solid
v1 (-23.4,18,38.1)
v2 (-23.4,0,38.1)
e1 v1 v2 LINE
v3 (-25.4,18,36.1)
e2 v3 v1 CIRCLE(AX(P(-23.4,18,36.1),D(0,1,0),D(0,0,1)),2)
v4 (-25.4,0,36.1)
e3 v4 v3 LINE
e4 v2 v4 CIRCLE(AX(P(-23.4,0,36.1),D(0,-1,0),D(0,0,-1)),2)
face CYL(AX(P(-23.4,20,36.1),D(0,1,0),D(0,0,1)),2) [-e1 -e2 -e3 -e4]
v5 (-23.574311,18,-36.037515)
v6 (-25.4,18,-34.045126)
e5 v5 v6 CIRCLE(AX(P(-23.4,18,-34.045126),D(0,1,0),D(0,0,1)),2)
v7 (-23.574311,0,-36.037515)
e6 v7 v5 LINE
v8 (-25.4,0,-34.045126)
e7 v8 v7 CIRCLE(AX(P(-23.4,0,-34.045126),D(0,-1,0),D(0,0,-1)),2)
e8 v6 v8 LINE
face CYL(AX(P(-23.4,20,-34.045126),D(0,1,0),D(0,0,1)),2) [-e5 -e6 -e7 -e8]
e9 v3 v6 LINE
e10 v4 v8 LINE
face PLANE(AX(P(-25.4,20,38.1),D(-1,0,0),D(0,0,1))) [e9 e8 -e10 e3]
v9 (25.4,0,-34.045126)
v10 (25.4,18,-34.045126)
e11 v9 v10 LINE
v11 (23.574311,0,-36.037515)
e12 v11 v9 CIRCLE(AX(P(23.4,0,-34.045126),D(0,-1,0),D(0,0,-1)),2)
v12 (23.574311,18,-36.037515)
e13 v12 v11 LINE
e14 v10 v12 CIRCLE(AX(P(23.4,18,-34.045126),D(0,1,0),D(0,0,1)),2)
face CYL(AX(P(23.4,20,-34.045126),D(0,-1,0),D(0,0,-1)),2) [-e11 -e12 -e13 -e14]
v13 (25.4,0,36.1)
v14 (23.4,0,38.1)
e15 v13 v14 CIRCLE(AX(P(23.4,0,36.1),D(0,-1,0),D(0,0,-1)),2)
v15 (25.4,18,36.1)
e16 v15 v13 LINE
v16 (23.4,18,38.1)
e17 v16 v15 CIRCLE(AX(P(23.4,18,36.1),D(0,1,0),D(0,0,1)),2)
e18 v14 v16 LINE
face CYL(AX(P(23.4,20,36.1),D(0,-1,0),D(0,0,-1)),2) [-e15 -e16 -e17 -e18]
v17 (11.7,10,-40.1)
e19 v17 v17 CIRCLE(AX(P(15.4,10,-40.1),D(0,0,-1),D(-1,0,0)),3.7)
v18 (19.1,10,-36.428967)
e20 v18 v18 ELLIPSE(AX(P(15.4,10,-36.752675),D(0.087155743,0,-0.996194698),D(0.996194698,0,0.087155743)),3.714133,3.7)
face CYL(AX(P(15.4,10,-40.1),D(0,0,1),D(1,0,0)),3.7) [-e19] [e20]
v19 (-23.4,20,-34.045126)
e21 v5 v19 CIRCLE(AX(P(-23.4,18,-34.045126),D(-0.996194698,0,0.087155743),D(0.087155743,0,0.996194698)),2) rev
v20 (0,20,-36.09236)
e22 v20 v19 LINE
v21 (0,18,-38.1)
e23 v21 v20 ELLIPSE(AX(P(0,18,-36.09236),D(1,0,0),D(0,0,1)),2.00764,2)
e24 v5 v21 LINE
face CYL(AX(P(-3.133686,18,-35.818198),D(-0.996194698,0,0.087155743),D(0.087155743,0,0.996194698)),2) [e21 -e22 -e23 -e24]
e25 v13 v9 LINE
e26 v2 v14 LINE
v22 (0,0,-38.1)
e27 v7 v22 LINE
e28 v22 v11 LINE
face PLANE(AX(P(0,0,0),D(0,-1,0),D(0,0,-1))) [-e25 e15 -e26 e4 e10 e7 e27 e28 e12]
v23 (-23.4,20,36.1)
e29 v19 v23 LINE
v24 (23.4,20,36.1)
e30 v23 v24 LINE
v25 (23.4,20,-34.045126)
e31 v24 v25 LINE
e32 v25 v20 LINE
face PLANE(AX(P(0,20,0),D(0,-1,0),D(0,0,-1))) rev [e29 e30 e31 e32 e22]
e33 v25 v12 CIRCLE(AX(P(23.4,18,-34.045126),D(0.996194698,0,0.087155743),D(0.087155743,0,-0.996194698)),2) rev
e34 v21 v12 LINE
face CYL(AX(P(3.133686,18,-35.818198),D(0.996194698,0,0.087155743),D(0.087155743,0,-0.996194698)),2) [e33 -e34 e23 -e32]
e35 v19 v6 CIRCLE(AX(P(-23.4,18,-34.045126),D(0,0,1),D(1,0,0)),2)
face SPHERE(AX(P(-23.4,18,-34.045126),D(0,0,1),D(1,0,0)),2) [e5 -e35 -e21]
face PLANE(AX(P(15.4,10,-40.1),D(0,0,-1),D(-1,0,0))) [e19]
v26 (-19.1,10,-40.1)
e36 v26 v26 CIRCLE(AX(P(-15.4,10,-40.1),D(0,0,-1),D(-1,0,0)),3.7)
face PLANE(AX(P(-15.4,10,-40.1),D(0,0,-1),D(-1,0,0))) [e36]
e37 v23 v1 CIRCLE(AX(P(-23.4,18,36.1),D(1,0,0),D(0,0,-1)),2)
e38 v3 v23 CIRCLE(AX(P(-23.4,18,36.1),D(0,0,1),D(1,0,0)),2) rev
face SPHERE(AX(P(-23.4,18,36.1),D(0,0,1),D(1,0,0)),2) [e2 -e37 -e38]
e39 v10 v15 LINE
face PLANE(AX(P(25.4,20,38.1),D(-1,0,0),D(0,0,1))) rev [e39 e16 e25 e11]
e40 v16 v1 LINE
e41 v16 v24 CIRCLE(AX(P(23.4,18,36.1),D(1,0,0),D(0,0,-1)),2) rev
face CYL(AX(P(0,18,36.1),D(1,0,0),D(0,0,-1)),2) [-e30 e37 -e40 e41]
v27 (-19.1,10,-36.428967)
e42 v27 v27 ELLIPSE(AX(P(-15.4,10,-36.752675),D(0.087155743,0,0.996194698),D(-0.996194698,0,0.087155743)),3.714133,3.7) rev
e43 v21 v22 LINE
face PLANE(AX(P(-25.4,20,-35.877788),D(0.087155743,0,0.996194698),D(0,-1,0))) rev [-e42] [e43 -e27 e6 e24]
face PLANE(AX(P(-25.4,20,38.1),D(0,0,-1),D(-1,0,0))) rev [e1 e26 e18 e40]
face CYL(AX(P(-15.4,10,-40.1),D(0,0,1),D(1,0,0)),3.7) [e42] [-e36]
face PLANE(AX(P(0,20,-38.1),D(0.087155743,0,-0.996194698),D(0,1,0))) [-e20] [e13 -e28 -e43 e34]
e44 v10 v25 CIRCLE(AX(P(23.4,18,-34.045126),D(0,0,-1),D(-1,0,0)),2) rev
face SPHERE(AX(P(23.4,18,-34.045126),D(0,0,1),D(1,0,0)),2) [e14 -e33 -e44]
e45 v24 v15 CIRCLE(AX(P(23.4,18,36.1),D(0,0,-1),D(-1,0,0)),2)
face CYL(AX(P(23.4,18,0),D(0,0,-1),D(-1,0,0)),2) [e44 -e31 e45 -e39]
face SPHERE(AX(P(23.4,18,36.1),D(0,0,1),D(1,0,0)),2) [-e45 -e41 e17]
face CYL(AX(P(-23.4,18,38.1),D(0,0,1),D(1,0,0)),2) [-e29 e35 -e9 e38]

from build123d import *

# Parameters (mm, degrees)
SKETCH1_W           = 50.8
SKETCH1_H           = 76.2
BOSS_EXTRUDE2_DEPTH = 20
SKETCH2_R           = 3.7
BOSS_EXTRUDE3_DEPTH = 2
CHAMFER7_SIZE       = 2.222212054
CHAMFER7_SIZE_2     = 25.4
FILLET6_R           = 2
FILLET7_R           = 2
FILLET8_R           = 2
FILLET9_R           = 2
FILLET10_R          = 2


with BuildPart() as part:
    # Sketch1 → Boss-Extrude2 (new body)
    with BuildSketch(Plane(origin=(0, 0, 0), x_dir=(1, 0, 0), z_dir=(0, 1, 0))):
        Rectangle(SKETCH1_W, SKETCH1_H)
    extrude(amount=BOSS_EXTRUDE2_DEPTH)

    # Sketch2 → Boss-Extrude3 (add)
    with BuildSketch(Plane(origin=(0, 0, -38.1), x_dir=(-1, 0, 0), z_dir=(0, 0, -1))):
        with Locations((-15.4, 10)):
            Circle(SKETCH2_R)
        with Locations((15.4, 10)):
            Circle(SKETCH2_R)
    extrude(amount=BOSS_EXTRUDE3_DEPTH)

    # Chamfer7
    # the kernel refuses this chamfer: 25.4, 2.222212054 mm, written as the material it takes off along each edge
    with BuildSketch(Plane(origin=(-25.4, -66.030705628, -38.1), x_dir=(-0.40120984275090654, 0, 0.9159861691531116), z_dir=(0, 1, 0))) as chamfer7_piece_1_section:
        Polygon((CHAMFER7_SIZE * 0.915986168971, CHAMFER7_SIZE * 0.401209842671), (-CHAMFER7_SIZE_2 * 0.401209842751, CHAMFER7_SIZE_2 * 0.915986169153), (0, 0), align=None)
    chamfer7_piece_1 = extrude(amount=152.061411256, mode=Mode.PRIVATE)
    chamfer7_piece_1 = chamfer7_piece_1 - Plane(origin=(-15.4, 10, -36.375506271), x_dir=(-1, 0, 0), z_dir=(0, 0, 1)) * Cylinder(3.7, 398, mode=Mode.PRIVATE)
    add(chamfer7_piece_1, mode=Mode.SUBTRACT)
    with BuildSketch(Plane(origin=(25.4, -66.030705628, -38.1), x_dir=(0.4012098427509076, 0, 0.9159861691531113), z_dir=(0, 1, 0))) as chamfer7_piece_2_section:
        Polygon((CHAMFER7_SIZE * 0.915986168971, -CHAMFER7_SIZE * 0.401209842671), (-CHAMFER7_SIZE_2 * 0.401209842751, -CHAMFER7_SIZE_2 * 0.915986169153), (0, 0), align=None)
    chamfer7_piece_2 = extrude(amount=152.061411256, mode=Mode.PRIVATE)
    chamfer7_piece_2 = chamfer7_piece_2 - Plane(origin=(15.4, 10, -36.375506337), x_dir=(-1, 0, 0), z_dir=(0, 0, 1)) * Cylinder(3.7, 398, mode=Mode.PRIVATE)
    add(chamfer7_piece_2, mode=Mode.SUBTRACT)

    # Fillet6
    fillet6_edges = [part.edges().sort_by_distance(p)[0] for p in [
        (25.4, 20, 1.111106027),
        (0, 20, 38.1),
        (12.7, 20, -36.988893973),
        (-12.7, 20, -36.988893973),
        (-25.4, 20, 1.111106027),
    ]]
    fillet(fillet6_edges, radius=FILLET6_R)

    # Fillet7
    # the kernel refuses this fillet: 2 mm, written as the material it takes off along each edge
    with BuildSketch(Plane(origin=(23.4, 18, -34.045125598), x_dir=(1, 0, 0), z_dir=(0, 1, 0))) as fillet7_piece_1_section:
        Polygon((0, 0), (FILLET7_R, 0), (FILLET7_R, FILLET7_R * 0.916331174017), (FILLET7_R * 0.0871557427476, FILLET7_R * 0.996194698092), align=None)
    fillet7_piece_1 = extrude(amount=FILLET7_R, mode=Mode.PRIVATE)
    fillet7_piece_1 = fillet7_piece_1 - Plane(origin=(23.4, 18, -34.045125598), x_dir=(-0.73727733681012, 0, 0.6755902076156647), z_dir=(0, 1, 0)) * Sphere(FILLET7_R, mode=Mode.PRIVATE)
    add(fillet7_piece_1, mode=Mode.SUBTRACT)
    with BuildSketch(Plane(origin=(25.4, -4.58165587, -35.877787946), x_dir=(0, 0, 1), z_dir=(0, 1, 0))) as fillet7_piece_2:
        with BuildLine():
            CenterArc((FILLET7_R * 0.916331174017, -FILLET7_R), FILLET7_R, 90, 85)
            Line((-FILLET7_R * 0.0798635240743, -FILLET7_R * 0.912844257252), (0, 0))
            Line((0, 0), (FILLET7_R * 0.916331174017, 0))
        make_face()
    extrude(amount=22.58165587, mode=Mode.SUBTRACT)

    # Fillet8
    # the kernel refuses this fillet: 2 mm, written as the material it takes off along each edge
    with BuildSketch(Plane(origin=(23.4, 18, 36.1), x_dir=(1, 0, 0), z_dir=(0, 0, 1))) as fillet8_piece_1_section:
        Polygon((0, 0), (FILLET8_R, 0), (FILLET8_R, FILLET8_R), (0, FILLET8_R), align=None)
    fillet8_piece_1 = extrude(amount=FILLET8_R, mode=Mode.PRIVATE)
    fillet8_piece_1 = fillet8_piece_1 - Plane(origin=(23.4, 18, 36.1), x_dir=(-0.7071067811865475, -0.7071067811865475, 0), z_dir=(0, 0, 1)) * Sphere(FILLET8_R, mode=Mode.PRIVATE)
    add(fillet8_piece_1, mode=Mode.SUBTRACT)
    with BuildSketch(Plane(origin=(25.4, -5, 38.1), x_dir=(-1, 0, 0), z_dir=(0, 1, 0))) as fillet8_piece_2:
        with BuildLine():
            CenterArc((FILLET8_R, -FILLET8_R), FILLET8_R, 90, 90)
            Line((0, -FILLET8_R), (0, 0))
            Line((0, 0), (FILLET8_R, 0))
        make_face()
    extrude(amount=23, mode=Mode.SUBTRACT)

    # Fillet9
    # the kernel refuses this fillet: 2 mm, written as the material it takes off along each edge
    with BuildSketch(Plane(origin=(-23.4, 18, 36.1), x_dir=(-1, 0, 0), z_dir=(0, 0, 1))) as fillet9_piece_1_section:
        Polygon((0, 0), (FILLET9_R, 0), (FILLET9_R, -FILLET9_R), (0, -FILLET9_R), align=None)
    fillet9_piece_1 = extrude(amount=FILLET9_R, mode=Mode.PRIVATE)
    fillet9_piece_1 = fillet9_piece_1 - Plane(origin=(-23.4, 18, 36.1), x_dir=(0.7071067811865475, -0.7071067811865475, 0), z_dir=(0, 0, 1)) * Sphere(FILLET9_R, mode=Mode.PRIVATE)
    add(fillet9_piece_1, mode=Mode.SUBTRACT)
    with BuildSketch(Plane(origin=(-25.4, -5, 38.1), x_dir=(1, 0, 0), z_dir=(0, 1, 0))) as fillet9_piece_2:
        with BuildLine():
            CenterArc((FILLET9_R, FILLET9_R), FILLET9_R, 180, 90)
            Line((0, FILLET9_R), (0, 0))
            Line((0, 0), (FILLET9_R, 0))
        make_face()
    extrude(amount=23, mode=Mode.SUBTRACT)

    # Fillet10
    # the kernel refuses this fillet: 2 mm, written as the material it takes off along each edge
    with BuildSketch(Plane(origin=(-23.4, 18, -34.045125598), x_dir=(-1, 0, 0), z_dir=(0, 1, 0))) as fillet10_piece_1_section:
        Polygon((0, 0), (FILLET10_R, 0), (FILLET10_R, -FILLET10_R * 0.916331174017), (FILLET10_R * 0.0871557427476, -FILLET10_R * 0.996194698092), align=None)
    fillet10_piece_1 = extrude(amount=FILLET10_R, mode=Mode.PRIVATE)
    fillet10_piece_1 = fillet10_piece_1 - Plane(origin=(-23.4, 18, -34.045125598), x_dir=(0.73727733681012, 0, 0.6755902076156647), z_dir=(0, 1, 0)) * Sphere(FILLET10_R, mode=Mode.PRIVATE)
    add(fillet10_piece_1, mode=Mode.SUBTRACT)
    with BuildSketch(Plane(origin=(-25.4, -4.58165587, -35.877787946), x_dir=(0, 0, 1), z_dir=(0, 1, 0))) as fillet10_piece_2:
        with BuildLine():
            CenterArc((FILLET10_R * 0.916331174017, FILLET10_R), FILLET10_R, 185, 85)
            Line((-FILLET10_R * 0.0798635240743, FILLET10_R * 0.912844257252), (0, 0))
            Line((0, 0), (FILLET10_R * 0.916331174017, 0))
        make_face()
    extrude(amount=22.58165587, mode=Mode.SUBTRACT)


solid = part.part
